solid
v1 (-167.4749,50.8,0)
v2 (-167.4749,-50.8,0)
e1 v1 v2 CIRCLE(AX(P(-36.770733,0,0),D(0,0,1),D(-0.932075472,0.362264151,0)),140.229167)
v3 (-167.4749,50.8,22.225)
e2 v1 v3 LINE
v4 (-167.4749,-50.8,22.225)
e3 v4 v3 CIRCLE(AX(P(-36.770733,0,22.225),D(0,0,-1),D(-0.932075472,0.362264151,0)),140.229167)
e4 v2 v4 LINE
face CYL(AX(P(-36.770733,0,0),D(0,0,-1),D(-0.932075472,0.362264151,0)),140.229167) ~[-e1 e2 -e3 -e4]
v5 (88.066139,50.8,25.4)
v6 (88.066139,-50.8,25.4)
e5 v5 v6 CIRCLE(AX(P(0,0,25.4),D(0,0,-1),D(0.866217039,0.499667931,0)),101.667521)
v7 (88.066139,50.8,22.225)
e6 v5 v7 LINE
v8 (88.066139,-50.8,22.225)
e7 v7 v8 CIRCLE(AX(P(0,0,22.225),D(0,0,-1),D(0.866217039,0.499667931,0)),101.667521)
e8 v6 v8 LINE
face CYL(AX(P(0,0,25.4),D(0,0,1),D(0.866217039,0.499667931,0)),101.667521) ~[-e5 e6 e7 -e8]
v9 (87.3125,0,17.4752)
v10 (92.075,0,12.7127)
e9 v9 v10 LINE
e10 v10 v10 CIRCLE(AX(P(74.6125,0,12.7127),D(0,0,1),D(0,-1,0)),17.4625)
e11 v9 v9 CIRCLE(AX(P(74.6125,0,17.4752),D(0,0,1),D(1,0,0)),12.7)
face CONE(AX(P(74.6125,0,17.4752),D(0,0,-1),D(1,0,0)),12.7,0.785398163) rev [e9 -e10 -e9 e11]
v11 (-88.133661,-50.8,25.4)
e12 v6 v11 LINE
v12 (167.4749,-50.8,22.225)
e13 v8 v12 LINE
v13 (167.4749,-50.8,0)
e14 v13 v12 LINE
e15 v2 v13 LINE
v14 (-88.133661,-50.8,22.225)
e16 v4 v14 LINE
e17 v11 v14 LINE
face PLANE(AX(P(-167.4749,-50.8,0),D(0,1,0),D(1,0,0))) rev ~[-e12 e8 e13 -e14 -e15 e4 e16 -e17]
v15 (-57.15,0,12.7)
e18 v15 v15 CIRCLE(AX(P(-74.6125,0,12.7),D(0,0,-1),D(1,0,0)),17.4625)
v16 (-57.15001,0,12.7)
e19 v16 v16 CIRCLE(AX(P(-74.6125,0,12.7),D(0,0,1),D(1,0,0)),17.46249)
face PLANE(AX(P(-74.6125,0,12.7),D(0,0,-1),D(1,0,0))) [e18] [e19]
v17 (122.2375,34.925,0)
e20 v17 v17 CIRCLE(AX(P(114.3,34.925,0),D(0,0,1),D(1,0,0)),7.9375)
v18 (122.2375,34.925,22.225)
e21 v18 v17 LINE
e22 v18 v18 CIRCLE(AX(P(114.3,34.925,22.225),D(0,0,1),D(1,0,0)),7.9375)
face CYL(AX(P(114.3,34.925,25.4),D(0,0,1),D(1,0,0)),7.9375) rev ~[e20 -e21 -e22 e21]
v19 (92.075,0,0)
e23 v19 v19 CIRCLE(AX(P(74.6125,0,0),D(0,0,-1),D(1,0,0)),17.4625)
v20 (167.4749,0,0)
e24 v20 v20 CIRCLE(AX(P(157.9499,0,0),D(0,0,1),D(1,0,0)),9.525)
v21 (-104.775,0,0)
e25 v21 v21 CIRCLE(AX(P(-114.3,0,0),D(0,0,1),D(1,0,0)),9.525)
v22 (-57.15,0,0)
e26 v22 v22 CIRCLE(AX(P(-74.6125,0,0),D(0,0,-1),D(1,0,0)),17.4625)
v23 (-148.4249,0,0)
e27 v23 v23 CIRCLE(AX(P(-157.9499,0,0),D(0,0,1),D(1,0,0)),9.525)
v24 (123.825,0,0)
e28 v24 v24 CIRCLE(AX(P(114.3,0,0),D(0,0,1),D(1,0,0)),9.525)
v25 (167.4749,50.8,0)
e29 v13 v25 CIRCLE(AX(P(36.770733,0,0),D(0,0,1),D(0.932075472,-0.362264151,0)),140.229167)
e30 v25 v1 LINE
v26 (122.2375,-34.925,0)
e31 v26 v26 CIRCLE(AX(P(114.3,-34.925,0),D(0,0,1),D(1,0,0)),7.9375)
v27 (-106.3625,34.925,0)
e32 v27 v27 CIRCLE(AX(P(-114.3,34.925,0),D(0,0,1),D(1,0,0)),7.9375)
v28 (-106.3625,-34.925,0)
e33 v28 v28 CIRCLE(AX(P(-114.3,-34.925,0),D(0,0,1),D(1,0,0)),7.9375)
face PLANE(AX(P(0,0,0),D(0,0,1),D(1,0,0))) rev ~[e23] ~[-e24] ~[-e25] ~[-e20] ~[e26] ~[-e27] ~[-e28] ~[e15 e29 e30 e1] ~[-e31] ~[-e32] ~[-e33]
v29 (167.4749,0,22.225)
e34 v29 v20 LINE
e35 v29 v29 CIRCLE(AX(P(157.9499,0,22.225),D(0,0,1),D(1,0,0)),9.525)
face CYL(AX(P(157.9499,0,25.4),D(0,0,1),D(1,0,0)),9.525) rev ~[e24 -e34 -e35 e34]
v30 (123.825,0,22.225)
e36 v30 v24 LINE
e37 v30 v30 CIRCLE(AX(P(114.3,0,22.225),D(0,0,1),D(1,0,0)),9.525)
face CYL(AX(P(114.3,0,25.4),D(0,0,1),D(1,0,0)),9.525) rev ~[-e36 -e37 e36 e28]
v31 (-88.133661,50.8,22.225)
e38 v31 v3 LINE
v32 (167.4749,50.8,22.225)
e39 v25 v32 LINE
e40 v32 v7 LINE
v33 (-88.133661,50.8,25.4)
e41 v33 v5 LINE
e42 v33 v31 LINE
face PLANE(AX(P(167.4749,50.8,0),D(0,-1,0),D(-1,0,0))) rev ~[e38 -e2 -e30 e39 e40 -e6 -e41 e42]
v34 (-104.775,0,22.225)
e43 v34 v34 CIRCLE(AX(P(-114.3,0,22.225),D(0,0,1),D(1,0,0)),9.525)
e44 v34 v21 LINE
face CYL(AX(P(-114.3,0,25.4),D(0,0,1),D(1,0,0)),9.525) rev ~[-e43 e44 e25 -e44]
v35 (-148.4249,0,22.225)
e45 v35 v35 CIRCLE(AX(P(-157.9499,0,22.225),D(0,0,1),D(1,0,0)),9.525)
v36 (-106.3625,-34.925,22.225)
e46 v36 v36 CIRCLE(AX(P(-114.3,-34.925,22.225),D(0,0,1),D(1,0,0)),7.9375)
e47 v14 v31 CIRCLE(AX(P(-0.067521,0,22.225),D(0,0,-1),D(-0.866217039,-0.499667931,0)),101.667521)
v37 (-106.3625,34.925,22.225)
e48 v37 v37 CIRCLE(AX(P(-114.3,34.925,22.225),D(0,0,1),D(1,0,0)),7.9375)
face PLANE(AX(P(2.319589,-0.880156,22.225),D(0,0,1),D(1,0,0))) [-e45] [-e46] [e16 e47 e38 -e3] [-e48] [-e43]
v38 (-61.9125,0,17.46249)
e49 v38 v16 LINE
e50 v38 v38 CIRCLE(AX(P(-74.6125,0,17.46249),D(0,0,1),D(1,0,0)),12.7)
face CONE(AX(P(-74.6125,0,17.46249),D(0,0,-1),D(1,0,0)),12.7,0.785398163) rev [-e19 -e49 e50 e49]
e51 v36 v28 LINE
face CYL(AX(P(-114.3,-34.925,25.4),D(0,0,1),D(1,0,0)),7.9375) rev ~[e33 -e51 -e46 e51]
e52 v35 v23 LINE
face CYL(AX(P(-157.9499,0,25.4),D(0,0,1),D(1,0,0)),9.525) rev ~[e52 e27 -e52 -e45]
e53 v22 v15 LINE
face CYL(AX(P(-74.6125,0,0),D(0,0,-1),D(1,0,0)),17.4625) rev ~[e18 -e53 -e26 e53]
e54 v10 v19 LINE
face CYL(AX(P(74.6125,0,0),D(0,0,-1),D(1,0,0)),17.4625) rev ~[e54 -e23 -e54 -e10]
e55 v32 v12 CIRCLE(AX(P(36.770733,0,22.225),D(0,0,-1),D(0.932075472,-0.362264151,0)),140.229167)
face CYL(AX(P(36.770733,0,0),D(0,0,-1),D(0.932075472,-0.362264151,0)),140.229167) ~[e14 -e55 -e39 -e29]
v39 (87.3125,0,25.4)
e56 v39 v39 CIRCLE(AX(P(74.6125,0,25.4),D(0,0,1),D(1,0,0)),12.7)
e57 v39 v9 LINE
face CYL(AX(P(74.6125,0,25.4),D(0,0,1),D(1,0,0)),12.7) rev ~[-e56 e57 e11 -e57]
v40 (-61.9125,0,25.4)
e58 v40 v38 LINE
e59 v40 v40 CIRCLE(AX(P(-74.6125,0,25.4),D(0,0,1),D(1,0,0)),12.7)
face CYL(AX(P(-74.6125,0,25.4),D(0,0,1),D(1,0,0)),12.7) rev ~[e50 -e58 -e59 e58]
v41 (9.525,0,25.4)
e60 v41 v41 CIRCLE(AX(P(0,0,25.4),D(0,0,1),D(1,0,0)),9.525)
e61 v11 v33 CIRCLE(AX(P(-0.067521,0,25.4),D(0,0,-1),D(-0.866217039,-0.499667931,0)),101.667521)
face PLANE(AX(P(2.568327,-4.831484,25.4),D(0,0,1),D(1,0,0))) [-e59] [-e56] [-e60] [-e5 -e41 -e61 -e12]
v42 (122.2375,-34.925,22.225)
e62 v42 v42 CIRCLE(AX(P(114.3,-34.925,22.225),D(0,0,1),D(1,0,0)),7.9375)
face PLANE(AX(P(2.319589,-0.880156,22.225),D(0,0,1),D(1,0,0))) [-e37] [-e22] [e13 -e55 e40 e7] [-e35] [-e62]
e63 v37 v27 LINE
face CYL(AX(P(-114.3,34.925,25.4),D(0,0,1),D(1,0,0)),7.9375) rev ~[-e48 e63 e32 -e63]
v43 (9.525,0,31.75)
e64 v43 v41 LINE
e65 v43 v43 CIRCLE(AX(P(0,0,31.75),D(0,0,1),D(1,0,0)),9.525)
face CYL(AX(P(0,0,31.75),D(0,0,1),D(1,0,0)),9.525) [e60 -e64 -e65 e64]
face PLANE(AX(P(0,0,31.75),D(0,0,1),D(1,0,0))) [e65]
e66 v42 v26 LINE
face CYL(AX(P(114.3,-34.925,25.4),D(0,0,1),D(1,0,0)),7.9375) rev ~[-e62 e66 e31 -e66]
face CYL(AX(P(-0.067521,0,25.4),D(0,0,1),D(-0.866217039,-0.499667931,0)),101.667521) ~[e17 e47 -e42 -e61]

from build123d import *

# Parameters (mm, degrees)
F1_DEPTH     = 31.75
F2_W         = 377.4263709784
F2_H         = 129.2024739087
F2_R         = 9.525
F3_DEPTH     = 6.35
F4_W         = 382.6104104519
F4_H         = 158.9530184865
F5_DEPTH     = 3.175
F6_R         = 12.7
F6_R_2       = 9.525
F6_R_3       = 7.9375
F7_DEPTH     = 25.4
F8_R         = 17.4625
F9_DEPTH     = 12.7
F10_S5_R     = 17.4625
F10_T6_DEPTH = 26
F11_SIZE     = 4.76249


# Not quite as in the source:
# - a fillet or chamfer that OpenCascade refuses, or shapes differently, is made with other operations: its cross-section is extruded or revolved along the edge and cut away or added
# - a fillet or chamfer is up to 0.001 mm smaller than in the source, because OpenCascade refuses the exact size


with BuildPart() as f1:
    # F0 (on Top) → F1 (new body)
    with BuildSketch(Plane.XY):
        with BuildLine():
            Line((167.4749, 50.8), (-167.4749, 50.8))
            ThreePointArc((-167.4749, 50.8), (-176.9999, 0), (-167.4749, -50.8))
            Line((-167.4749, -50.8), (167.4749, -50.8))
            ThreePointArc((167.4749, -50.8), (176.9999, 0), (167.4749, 50.8))
        make_face()
    extrude(amount=F1_DEPTH)

    # F2 (on face) → F3 (cut)
    with BuildSketch(Plane.XY.offset(31.75)):
        with Locations((2.5683268905, -4.8314835876)):
            Rectangle(F2_W, F2_H)
        Circle(F2_R, mode=Mode.SUBTRACT)
    extrude(amount=-F3_DEPTH, mode=Mode.SUBTRACT)

    # F4 (on face) → F5 (cut)
    with BuildSketch(Plane.XY.offset(25.4)):
        with Locations((2.3195892572, -0.8801557124)):
            Rectangle(F4_W, F4_H)
        with BuildLine():
            Line((-167.4749, 50.8), (-88.1336606718, 50.8))
            Line((-88.1336606718, 50.8), (88.0661393282, 50.8))
            Line((88.0661393282, 50.8), (167.4749, 50.8))
            ThreePointArc((167.4749, 50.8), (176.9999, 0), (167.4749, -50.8))
            Line((167.4749, -50.8), (88.0661393282, -50.8))
            Line((88.0661393282, -50.8), (-88.1336606718, -50.8))
            Line((-88.1336606718, -50.8), (-167.4749, -50.8))
            ThreePointArc((-167.4749, -50.8), (-176.9999, 0), (-167.4749, 50.8))
        make_face(mode=Mode.SUBTRACT)
        with BuildLine():
            Line((167.4749, 50.8), (88.0661393282, 50.8))
            ThreePointArc((88.0661393282, 50.8), (101.6675213437, 0), (88.0661393282, -50.8))
            Line((88.0661393282, -50.8), (167.4749, -50.8))
            ThreePointArc((167.4749, -50.8), (176.9999, 0), (167.4749, 50.8))
        make_face()
        with BuildLine():
            ThreePointArc((-88.1336606718, -50.8), (-101.7350426874, 0), (-88.1336606718, 50.8))
            Line((-88.1336606718, 50.8), (-167.4749, 50.8))
            ThreePointArc((-167.4749, 50.8), (-176.9999, 0), (-167.4749, -50.8))
            Line((-167.4749, -50.8), (-88.1336606718, -50.8))
        make_face()
    extrude(amount=-F5_DEPTH, mode=Mode.SUBTRACT)

    # F6 (on face) → F7 (cut)
    with BuildSketch(Plane.XY.offset(25.4)):
        with Locations((-74.6125, 0)):
            Circle(F6_R)
        with Locations((74.6125, 0)):
            Circle(F6_R)
        with Locations((114.3, 0)):
            Circle(F6_R_2)
        with Locations((157.9499, 0)):
            Circle(F6_R_2)
        with Locations((-114.3, 0)):
            Circle(F6_R_2)
        with Locations((-157.9499, 0)):
            Circle(F6_R_2)
        with Locations((-114.3, 34.925)):
            Circle(F6_R_3)
        with Locations((-114.3, -34.925)):
            Circle(F6_R_3)
        with Locations((114.3, 34.925)):
            Circle(F6_R_3)
        with Locations((114.3, -34.925)):
            Circle(F6_R_3)
    extrude(amount=-F7_DEPTH, mode=Mode.SUBTRACT)

    # F8 (on face) → F9 (cut)
    with BuildSketch(Plane(origin=(0, 0, 0), x_dir=(1, 0, 0), z_dir=(0, 0, -1))):
        with Locations((-74.6125, 0)):
            Circle(F8_R)
        with Locations((74.6125, 0)):
            Circle(F8_R)
    extrude(amount=-F9_DEPTH, mode=Mode.SUBTRACT)

    # F10: chamfer of 4.7752 on 1 edges, made by hand


with BuildPart() as f10_tool2:
    # F10_s3 → F10_t4 (revolve)
    with BuildSketch(Plane.XZ):
        Polygon((87.3125, 17.4752), (92.0877, 12.7), (87.3125, 12.7), align=None)
    revolve(axis=Axis((74.6125, 0, 12.7), (0, 0, 1)))

    # F10_s5 → F10_t6 (intersect, symmetric)
    with BuildSketch(Plane.XY.offset(15.1)):
        with Locations((74.6125, 0)):
            Circle(F10_S5_R)
    extrude(amount=F10_T6_DEPTH, both=True, mode=Mode.INTERSECT)


with BuildPart() as f1_1:
    add(f1.part)

    # F10_t1: cut F10_tool2
    add(f10_tool2.part, mode=Mode.SUBTRACT)

    # F11 (size 4.7625 in the source; OpenCascade refuses exactly that, so slightly less here)
    f11_edges = [f1_1.edges().sort_by_distance(p)[0] for p in [
        (-87.3125, 0, 12.7),
    ]]
    chamfer(f11_edges, length=F11_SIZE)


solid = f1_1.part
